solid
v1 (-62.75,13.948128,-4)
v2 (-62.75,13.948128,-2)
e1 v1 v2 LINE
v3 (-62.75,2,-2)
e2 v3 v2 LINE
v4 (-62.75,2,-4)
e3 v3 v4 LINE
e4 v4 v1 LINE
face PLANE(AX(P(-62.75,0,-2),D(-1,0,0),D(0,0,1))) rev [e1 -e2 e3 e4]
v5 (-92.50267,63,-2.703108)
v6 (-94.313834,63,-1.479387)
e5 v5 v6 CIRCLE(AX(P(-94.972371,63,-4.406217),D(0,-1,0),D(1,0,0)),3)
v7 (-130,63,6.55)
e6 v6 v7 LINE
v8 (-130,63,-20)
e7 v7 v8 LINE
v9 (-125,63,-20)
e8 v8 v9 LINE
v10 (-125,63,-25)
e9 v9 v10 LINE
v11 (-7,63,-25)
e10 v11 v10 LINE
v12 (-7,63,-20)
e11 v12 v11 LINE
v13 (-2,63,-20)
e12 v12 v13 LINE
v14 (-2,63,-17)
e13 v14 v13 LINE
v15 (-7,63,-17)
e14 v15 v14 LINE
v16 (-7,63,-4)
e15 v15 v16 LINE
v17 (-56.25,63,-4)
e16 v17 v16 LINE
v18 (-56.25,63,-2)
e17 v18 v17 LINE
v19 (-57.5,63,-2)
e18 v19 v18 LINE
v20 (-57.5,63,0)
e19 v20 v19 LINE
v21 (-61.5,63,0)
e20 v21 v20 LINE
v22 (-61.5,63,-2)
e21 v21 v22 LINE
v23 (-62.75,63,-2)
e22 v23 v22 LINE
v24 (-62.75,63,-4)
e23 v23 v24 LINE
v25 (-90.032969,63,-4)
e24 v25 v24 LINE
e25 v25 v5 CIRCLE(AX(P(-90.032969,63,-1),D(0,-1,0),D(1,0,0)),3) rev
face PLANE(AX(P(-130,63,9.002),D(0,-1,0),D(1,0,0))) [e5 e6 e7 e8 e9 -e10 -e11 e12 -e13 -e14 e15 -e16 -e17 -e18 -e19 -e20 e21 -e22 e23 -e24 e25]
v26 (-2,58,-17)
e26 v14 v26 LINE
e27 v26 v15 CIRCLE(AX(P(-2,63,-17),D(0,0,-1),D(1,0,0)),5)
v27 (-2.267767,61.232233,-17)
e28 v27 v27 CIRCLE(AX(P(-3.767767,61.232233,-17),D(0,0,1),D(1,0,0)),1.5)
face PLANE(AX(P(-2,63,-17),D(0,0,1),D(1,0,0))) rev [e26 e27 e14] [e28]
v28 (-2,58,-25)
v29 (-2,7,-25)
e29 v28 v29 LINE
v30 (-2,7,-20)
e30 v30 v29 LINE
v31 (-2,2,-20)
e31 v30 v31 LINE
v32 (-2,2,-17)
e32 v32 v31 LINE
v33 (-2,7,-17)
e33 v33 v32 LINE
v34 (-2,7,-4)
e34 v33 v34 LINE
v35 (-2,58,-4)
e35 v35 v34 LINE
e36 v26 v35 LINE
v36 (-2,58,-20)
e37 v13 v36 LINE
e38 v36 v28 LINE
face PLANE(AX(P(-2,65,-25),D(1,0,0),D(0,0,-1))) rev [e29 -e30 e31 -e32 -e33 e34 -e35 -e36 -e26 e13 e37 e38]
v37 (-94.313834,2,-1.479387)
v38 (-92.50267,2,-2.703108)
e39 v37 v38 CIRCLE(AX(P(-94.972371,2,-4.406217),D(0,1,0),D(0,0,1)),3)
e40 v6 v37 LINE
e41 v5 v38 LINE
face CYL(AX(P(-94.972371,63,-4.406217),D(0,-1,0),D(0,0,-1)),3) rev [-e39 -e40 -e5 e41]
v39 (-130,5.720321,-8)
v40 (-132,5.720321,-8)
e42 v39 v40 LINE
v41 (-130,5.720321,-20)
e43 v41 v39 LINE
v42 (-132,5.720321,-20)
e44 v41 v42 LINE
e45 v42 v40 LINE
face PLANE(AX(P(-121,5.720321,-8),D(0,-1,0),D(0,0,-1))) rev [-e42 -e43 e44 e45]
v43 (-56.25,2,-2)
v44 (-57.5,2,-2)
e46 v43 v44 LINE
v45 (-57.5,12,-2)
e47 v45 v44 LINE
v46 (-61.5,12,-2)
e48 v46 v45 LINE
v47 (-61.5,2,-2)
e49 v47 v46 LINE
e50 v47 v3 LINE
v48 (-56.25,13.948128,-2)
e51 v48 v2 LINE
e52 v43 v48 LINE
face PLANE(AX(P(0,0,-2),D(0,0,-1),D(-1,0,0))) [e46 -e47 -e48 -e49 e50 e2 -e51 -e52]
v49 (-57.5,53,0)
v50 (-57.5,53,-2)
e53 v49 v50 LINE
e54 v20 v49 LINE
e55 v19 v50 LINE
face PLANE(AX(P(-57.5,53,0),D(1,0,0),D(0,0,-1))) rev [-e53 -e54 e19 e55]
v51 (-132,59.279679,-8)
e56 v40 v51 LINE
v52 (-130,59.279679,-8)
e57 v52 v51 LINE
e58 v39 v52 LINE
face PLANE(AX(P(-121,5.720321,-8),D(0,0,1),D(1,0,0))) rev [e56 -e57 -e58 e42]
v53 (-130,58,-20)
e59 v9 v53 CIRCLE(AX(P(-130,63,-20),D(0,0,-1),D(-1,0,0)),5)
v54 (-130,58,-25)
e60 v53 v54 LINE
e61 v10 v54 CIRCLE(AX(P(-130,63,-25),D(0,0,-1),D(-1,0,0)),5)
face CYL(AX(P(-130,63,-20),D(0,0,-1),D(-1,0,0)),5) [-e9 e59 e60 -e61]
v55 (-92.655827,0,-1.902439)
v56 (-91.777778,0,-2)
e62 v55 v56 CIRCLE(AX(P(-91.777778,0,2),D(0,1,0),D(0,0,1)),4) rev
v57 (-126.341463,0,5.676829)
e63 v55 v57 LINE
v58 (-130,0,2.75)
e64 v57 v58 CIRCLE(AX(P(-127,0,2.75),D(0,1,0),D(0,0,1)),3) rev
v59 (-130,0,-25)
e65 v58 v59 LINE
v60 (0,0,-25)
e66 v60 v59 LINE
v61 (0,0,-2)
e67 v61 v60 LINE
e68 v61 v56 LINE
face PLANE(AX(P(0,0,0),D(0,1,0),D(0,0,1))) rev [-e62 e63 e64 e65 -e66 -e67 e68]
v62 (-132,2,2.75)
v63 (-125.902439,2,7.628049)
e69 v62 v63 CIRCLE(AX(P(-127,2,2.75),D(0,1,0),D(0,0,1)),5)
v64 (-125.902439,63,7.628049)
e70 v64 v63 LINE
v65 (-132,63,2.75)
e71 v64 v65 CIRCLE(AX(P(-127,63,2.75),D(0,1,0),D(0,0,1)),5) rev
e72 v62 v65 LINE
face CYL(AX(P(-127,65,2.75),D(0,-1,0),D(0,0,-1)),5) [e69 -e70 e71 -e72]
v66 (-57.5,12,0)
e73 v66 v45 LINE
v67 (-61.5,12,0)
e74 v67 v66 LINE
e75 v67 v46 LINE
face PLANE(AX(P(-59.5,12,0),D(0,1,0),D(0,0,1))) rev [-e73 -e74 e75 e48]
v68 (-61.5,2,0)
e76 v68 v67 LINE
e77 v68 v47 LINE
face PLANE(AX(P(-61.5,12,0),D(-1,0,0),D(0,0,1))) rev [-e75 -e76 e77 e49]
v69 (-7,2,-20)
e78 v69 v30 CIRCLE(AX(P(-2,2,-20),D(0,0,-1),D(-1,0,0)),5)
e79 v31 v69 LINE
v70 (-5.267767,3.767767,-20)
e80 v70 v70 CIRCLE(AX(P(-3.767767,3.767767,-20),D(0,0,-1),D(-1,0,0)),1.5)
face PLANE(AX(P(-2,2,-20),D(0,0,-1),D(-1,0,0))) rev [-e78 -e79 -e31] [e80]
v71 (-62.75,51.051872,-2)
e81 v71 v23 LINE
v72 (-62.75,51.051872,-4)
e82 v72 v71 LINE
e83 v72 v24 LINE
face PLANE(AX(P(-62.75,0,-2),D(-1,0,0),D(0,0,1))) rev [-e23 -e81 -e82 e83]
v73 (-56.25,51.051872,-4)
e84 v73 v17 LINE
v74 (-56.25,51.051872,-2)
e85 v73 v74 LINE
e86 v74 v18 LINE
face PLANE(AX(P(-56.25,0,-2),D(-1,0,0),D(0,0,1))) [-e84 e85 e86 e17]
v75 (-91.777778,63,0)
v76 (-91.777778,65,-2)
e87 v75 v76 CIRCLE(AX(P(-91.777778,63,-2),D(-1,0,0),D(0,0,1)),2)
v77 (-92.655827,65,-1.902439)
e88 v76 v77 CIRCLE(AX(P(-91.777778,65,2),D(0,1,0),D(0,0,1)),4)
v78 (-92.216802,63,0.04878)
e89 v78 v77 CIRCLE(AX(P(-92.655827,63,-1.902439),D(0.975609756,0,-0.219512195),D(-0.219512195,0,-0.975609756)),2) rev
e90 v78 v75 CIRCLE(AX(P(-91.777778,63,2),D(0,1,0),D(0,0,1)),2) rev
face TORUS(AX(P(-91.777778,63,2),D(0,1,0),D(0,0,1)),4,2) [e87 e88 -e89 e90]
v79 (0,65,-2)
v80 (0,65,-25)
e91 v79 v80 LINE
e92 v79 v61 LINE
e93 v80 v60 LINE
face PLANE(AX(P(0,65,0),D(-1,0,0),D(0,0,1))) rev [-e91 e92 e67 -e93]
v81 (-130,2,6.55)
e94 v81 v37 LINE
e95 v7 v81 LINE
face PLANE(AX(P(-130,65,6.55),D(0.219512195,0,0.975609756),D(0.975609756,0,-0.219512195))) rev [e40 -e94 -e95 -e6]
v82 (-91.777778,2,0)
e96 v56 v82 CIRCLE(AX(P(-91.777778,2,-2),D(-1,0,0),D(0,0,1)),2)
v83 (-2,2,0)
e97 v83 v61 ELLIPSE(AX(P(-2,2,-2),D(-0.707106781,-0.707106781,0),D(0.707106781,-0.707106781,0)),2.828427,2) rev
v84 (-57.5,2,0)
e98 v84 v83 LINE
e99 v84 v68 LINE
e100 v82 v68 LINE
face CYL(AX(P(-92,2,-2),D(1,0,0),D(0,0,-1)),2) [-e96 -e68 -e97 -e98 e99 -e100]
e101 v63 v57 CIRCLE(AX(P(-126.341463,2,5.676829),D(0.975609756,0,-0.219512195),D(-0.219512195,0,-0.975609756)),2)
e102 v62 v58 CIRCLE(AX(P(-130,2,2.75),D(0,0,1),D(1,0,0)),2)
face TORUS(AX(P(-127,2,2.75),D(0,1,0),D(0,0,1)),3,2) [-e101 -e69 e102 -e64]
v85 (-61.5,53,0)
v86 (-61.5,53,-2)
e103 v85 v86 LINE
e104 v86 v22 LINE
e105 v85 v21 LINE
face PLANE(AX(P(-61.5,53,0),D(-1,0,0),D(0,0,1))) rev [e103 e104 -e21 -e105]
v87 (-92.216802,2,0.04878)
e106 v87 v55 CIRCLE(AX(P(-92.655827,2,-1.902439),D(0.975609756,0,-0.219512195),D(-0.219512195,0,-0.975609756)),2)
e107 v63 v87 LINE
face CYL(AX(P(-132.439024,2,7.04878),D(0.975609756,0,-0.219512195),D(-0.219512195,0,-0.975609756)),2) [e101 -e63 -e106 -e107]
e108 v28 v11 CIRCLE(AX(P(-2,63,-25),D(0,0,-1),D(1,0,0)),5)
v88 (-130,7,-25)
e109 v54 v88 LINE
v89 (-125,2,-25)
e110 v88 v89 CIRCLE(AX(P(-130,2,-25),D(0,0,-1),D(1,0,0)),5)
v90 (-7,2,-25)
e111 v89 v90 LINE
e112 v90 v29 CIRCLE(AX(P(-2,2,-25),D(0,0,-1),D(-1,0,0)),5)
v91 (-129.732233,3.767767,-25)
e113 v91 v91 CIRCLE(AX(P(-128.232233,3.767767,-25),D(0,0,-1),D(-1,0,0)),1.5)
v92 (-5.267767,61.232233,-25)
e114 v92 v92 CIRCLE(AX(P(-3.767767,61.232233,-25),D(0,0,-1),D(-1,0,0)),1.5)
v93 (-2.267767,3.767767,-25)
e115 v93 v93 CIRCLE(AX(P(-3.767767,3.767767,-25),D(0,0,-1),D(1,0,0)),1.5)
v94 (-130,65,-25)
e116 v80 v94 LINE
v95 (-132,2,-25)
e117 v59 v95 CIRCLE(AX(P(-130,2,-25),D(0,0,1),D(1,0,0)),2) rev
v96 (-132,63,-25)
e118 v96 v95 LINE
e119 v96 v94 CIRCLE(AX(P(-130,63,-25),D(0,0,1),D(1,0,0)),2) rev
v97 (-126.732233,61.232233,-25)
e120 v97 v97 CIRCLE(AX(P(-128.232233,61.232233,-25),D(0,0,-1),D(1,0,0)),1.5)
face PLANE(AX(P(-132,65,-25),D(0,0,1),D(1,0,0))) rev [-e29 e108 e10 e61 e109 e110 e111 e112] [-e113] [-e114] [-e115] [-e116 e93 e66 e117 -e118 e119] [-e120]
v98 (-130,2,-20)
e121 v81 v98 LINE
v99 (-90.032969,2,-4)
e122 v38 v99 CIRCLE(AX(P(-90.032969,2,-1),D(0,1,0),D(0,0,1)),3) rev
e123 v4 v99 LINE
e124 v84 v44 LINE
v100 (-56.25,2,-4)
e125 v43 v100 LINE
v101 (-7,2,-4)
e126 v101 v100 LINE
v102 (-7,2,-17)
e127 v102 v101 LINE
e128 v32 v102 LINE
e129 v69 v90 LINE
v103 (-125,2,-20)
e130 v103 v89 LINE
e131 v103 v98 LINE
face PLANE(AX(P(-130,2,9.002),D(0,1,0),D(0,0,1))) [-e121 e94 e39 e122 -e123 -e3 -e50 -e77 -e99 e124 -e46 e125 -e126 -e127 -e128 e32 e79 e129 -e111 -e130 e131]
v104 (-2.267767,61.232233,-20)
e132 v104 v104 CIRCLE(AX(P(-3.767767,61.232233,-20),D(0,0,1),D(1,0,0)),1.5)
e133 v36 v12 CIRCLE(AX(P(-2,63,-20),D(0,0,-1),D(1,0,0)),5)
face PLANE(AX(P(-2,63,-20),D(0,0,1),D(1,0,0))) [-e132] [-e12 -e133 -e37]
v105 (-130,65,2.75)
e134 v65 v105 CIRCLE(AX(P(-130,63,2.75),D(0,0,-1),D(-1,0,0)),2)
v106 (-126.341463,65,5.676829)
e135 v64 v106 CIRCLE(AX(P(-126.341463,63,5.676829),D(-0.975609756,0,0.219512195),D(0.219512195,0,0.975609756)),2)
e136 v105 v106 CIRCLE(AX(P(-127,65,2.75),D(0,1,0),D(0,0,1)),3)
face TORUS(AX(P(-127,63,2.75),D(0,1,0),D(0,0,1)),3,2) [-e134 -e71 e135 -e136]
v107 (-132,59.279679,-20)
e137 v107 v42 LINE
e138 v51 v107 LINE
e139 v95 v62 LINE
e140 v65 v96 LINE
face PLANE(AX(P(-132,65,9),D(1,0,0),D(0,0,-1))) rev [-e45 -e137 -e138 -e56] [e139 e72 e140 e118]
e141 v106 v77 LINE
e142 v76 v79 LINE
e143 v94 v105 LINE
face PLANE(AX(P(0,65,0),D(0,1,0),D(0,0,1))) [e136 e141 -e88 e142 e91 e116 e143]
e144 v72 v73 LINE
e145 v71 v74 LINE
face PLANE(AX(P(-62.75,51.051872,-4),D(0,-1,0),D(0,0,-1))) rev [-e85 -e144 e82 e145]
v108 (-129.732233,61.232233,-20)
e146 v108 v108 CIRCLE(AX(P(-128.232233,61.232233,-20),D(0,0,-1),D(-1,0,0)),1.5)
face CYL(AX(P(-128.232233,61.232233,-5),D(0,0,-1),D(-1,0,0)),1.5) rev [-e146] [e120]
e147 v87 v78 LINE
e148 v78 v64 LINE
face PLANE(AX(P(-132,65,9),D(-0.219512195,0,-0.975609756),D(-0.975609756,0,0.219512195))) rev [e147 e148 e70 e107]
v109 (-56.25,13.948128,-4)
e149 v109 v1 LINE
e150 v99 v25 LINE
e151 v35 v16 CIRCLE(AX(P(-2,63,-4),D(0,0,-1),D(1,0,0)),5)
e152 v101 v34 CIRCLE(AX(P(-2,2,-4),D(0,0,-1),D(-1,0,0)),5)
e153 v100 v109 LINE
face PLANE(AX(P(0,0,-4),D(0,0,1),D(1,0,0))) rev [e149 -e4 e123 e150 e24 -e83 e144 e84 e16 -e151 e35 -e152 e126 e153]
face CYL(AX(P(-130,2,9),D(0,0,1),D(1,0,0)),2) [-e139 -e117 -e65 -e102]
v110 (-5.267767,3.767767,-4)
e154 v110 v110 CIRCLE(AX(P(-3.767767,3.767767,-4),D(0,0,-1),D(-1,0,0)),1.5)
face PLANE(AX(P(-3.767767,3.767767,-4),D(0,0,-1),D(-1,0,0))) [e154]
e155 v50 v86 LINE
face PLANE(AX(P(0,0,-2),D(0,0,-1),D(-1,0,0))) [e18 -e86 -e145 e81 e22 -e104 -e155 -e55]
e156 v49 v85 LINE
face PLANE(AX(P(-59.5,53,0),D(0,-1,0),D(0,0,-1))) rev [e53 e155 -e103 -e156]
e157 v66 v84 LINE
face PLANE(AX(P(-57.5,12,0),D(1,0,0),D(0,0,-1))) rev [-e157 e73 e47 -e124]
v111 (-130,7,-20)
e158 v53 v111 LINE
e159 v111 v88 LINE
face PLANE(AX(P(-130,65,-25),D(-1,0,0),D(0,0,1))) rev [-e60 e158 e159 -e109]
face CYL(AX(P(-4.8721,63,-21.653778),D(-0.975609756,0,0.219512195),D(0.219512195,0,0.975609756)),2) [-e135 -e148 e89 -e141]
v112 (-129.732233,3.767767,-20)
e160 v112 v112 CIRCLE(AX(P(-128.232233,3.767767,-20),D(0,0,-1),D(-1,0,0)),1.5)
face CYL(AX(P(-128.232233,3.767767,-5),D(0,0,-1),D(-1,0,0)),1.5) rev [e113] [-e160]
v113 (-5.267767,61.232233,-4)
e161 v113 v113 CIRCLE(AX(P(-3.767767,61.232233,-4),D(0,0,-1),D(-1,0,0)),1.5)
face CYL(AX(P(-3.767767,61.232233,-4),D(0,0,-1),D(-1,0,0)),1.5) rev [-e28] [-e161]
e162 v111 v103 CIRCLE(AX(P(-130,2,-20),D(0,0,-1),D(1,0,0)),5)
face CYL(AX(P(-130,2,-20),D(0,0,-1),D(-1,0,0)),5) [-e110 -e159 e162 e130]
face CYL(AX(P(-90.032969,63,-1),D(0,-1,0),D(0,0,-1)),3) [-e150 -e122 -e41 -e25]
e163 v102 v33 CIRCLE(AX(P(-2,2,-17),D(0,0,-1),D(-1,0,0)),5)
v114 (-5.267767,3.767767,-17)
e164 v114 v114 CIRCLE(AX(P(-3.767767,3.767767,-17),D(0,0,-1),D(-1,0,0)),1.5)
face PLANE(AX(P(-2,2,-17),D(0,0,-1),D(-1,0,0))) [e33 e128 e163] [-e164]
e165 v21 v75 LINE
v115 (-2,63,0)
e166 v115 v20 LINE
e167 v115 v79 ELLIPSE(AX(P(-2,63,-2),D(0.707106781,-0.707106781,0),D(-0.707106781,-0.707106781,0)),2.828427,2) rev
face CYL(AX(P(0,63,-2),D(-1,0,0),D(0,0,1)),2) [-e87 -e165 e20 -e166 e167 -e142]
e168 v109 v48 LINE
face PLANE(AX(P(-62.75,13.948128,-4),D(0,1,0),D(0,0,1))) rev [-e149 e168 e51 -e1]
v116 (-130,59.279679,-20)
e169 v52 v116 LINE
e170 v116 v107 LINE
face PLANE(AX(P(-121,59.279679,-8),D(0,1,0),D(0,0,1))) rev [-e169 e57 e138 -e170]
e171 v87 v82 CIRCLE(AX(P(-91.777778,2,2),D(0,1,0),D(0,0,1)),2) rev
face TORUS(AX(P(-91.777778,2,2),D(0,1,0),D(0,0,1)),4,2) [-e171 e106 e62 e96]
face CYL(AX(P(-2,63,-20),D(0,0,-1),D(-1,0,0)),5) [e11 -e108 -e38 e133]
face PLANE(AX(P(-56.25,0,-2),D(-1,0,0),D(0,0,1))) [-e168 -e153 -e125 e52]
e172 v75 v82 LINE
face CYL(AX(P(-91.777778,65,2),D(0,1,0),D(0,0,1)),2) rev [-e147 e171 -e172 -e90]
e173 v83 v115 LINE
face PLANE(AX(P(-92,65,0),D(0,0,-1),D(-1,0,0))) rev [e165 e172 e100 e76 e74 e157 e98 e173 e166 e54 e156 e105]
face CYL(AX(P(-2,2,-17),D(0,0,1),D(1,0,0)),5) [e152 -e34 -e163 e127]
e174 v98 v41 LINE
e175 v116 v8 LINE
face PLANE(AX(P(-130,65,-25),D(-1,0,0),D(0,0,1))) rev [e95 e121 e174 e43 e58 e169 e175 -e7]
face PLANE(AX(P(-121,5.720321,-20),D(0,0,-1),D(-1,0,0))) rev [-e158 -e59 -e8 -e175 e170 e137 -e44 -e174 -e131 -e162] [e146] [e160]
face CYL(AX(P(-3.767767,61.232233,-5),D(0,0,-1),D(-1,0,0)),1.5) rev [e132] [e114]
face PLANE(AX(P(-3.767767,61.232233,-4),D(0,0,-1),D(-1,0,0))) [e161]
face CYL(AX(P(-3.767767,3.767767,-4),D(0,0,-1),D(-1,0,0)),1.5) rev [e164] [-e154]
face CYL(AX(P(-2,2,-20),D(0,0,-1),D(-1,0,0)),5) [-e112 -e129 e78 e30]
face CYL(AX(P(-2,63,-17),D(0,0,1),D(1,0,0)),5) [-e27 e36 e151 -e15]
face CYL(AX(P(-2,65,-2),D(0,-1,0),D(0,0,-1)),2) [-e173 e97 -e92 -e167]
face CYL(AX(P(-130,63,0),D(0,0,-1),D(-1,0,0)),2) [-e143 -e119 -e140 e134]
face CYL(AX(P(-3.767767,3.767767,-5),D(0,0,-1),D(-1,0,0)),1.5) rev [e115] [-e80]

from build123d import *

# Parameters (mm, degrees)
BOSS_EXTRUDE3_DEPTH = 65
BOSS_EXTRUDE4_REACH = 153.013
SKETCH4_W           = 128
SKETCH4_H           = 2
SKETCH5_W           = 12
SKETCH5_H           = 53.559358602
CUT_EXTRUDE2_DEPTH  = 11
FILLET1_R           = 5
FILLET2_R           = 2
SKETCH7_W           = 90
SKETCH7_H           = 61
BOSS_EXTRUDE5_DEPTH = 2
BOSS_EXTRUDE6_DEPTH = 5
SKETCH12_R          = 1.5
CUT_EXTRUDE5_DEPTH  = 20
BOSS_EXTRUDE7_START = 13
BOSS_EXTRUDE7_DEPTH = 13
SKETCH15_R          = 1.5
CUT_EXTRUDE6_DEPTH  = 21
SKETCH16_W          = 6.5
SKETCH16_H          = 61
CUT_EXTRUDE7_DEPTH  = 2
FILLET3_R           = 3
FILLET4_R           = 3
CUT_EXTRUDE9_DEPTH  = 2
SKETCH18_W          = 6.5
SKETCH18_H          = 37.103743482
BOSS_EXTRUDE8_DEPTH = 2


with BuildPart() as part:
    # Sketch3 → Boss-Extrude3 (new body)
    with BuildSketch(Plane(origin=(0, 0, 0), x_dir=(1, 0, 0), z_dir=(0, 1, 0))):
        Polygon((0, 0), (0, 25), (-2, 25), (-2, 2), (-92, 2), (-130, -6.55), (-130, 25), (-132, 25), (-132, -9), (-92, 0), align=None)
    extrude(amount=BOSS_EXTRUDE3_DEPTH)

    # Sketch4 → Boss-Extrude4 (add, up to next)
    with BuildSketch(Plane(origin=(0, 0, -25), x_dir=(-1, 0, 0), z_dir=(0, 0, -1)), mode=Mode.PRIVATE) as boss_extrude4_sk1:
        with Locations((66, 64)):
            Rectangle(SKETCH4_W, SKETCH4_H)
    boss_extrude4_tool1 = extrude(boss_extrude4_sk1.sketch, amount=-BOSS_EXTRUDE4_REACH, mode=Mode.PRIVATE) - part.part
    # Sketch4 → Boss-Extrude4 (add, up to next)
    with BuildSketch(Plane(origin=(0, 0, -25), x_dir=(-1, 0, 0), z_dir=(0, 0, -1)), mode=Mode.PRIVATE) as boss_extrude4_sk2:
        with Locations((66, 1)):
            Rectangle(SKETCH4_W, SKETCH4_H)
    boss_extrude4_tool2 = extrude(boss_extrude4_sk2.sketch, amount=-BOSS_EXTRUDE4_REACH, mode=Mode.PRIVATE) - part.part
    add(boss_extrude4_tool1.solids().sort_by_distance((-66, 64, -25))[0])
    add(boss_extrude4_tool2.solids().sort_by_distance((-66, 1, -25))[0])

    # Sketch5 → Cut-Extrude2 (cut)
    with BuildSketch(Plane.ZY.offset(132)):
        with Locations((-14, 32.5)):
            Rectangle(SKETCH5_W, SKETCH5_H)
    extrude(amount=-CUT_EXTRUDE2_DEPTH, mode=Mode.SUBTRACT)

    # Fillet1
    fillet1_edges = [part.edges().sort_by_distance(p)[0] for p in [
        (-132, 32.5, 9),
    ]]
    fillet(fillet1_edges, radius=FILLET1_R)

    # Fillet2
    fillet2_edges = [part.edges().sort_by_distance(p)[0] for p in [
        (-132, 0, -11.125),
        (-46, 0, 0),
        (-92, 32.5, 0),
        (0, 32.5, 0),
        (-132, 65, -11.125),
        (-46, 65, 0),
        (-108.951219512, 0, 3.81402439),
        (-108.951219512, 65, 3.81402439),
        (-130.123475238, 0, 6.654344047),
        (-130.123475238, 65, 6.654344047),
    ]]
    fillet(fillet2_edges, radius=FILLET2_R)

    # Sketch7 → Boss-Extrude5 (add)
    with BuildSketch(Plane(origin=(0, 0, -2), x_dir=(-1, 0, 0), z_dir=(0, 0, -1))):
        with Locations((47, 32.5)):
            Rectangle(SKETCH7_W, SKETCH7_H)
    extrude(amount=BOSS_EXTRUDE5_DEPTH)

    # Sketch11 → Boss-Extrude6 (add)
    with BuildSketch(Plane(origin=(0, 0, -25), x_dir=(-1, 0, 0), z_dir=(0, 0, -1))):
        with BuildLine():
            Line((7, 63), (2, 63))
            Line((2, 63), (2, 58))
            ThreePointArc((2, 58), (5.535533906, 59.464466094), (7, 63))
        make_face()
        with BuildLine():
            Line((2, 7), (2, 2))
            Line((2, 2), (7, 2))
            ThreePointArc((7, 2), (5.535533906, 5.535533906), (2, 7))
        make_face()
        with BuildLine():
            Line((125, 2), (130, 2))
            Line((130, 2), (130, 7))
            ThreePointArc((130, 7), (126.464466094, 5.535533906), (125, 2))
        make_face()
        with BuildLine():
            Line((125, 63), (130, 63))
            Line((130, 63), (130, 58))
            ThreePointArc((130, 58), (126.464466094, 59.464466094), (125, 63))
        make_face()
    extrude(amount=-BOSS_EXTRUDE6_DEPTH)

    # Sketch12 → Cut-Extrude5 (cut)
    with BuildSketch(Plane(origin=(0, 0, -25), x_dir=(-1, 0, 0), z_dir=(0, 0, -1))):
        with Locations((3.767766953, 61.232233047)):
            Circle(SKETCH12_R)
        with Locations((128.232233047, 61.232233047)):
            Circle(SKETCH12_R)
        with Locations((128.232233047, 3.767766953)):
            Circle(SKETCH12_R)
        with Locations((3.767766953, 3.767766953)):
            Circle(SKETCH12_R)
    extrude(amount=-CUT_EXTRUDE5_DEPTH, mode=Mode.SUBTRACT)

    # Sketch14 → Boss-Extrude7 (add)
    with BuildSketch(Plane(origin=(0, 0, -4), x_dir=(-1, 0, 0), z_dir=(0, 0, -1)).offset(BOSS_EXTRUDE7_START)):
        with BuildLine():
            Line((2, 58), (2, 63))
            Line((2, 63), (7, 63))
            ThreePointArc((7, 63), (5.535533906, 59.464466094), (2, 58))
        make_face()
        with BuildLine():
            Line((2, 2), (7, 2))
            ThreePointArc((7, 2), (5.535533906, 5.535533906), (2, 7))
            Line((2, 7), (2, 2))
        make_face()
    extrude(amount=-BOSS_EXTRUDE7_DEPTH)

    # Sketch15 → Cut-Extrude6 (cut)
    with BuildSketch(Plane(origin=(0, 0, -25), x_dir=(-1, 0, 0), z_dir=(0, 0, -1))):
        with Locations((3.767766953, 3.767766953)):
            Circle(SKETCH15_R)
        with Locations((3.767766953, 61.232233047)):
            Circle(SKETCH15_R)
    extrude(amount=-CUT_EXTRUDE6_DEPTH, mode=Mode.SUBTRACT)

    # Sketch16 → Cut-Extrude7 (cut)
    with BuildSketch(Plane(origin=(0, 0, -4), x_dir=(-1, 0, 0), z_dir=(0, 0, -1))):
        with Locations((59.5, 32.5)):
            Rectangle(SKETCH16_W, SKETCH16_H)
    extrude(amount=-CUT_EXTRUDE7_DEPTH, mode=Mode.SUBTRACT)

    # Fillet3
    # the kernel refuses this fillet: 3 mm, written as the material it adds along each edge
    with BuildSketch(Plane(origin=(-92, 2, -2), x_dir=(-2.9487523534032267e-12, 0, -1.0), z_dir=(0, 1, 0))) as fillet3_piece_1:
        with BuildLine():
            CenterArc((2.406216573, 2.972370787), FILLET3_R, 192.680383492, 69.537546468)
            Line((-0.520612695, 2.313834202), (-0.579149281, 2.30066347))
            Line((-0.579149281, 2.30066347), (-0.058536585, -0.013170732))
            Line((-0.058536585, -0.013170732), (0, -0.06))
            ThreePointArc((0, -0.06), (1, -0.06), (1.991875669, -0.059447416))
            Line((1.991875669, -0.059447416), (2, 0))
        make_face()
    extrude(amount=61)

    # Fillet4
    fillet4_edges = [part.edges().sort_by_distance(p)[0] for p in [
        (-92, 32.5, -4),
    ]]
    fillet(fillet4_edges, radius=FILLET4_R)

    # Sketch17 → Cut-Extrude9 (cut)
    with BuildSketch(Plane(origin=(0, 0, -2), x_dir=(-1, 0, 0), z_dir=(0, 0, -1))):
        Polygon((59.5, 53), (61.5, 53), (61.5, 63), (57.5, 63), (57.5, 53), align=None)
        Polygon((57.5, 2), (61.5, 2), (61.5, 12), (59.5, 12), (57.5, 12), align=None)
    extrude(amount=-CUT_EXTRUDE9_DEPTH, mode=Mode.SUBTRACT)

    # Sketch18 → Boss-Extrude8 (add)
    with BuildSketch(Plane(origin=(0, 0, -2), x_dir=(-1, 0, 0), z_dir=(0, 0, -1))):
        with Locations((59.5, 32.5)):
            Rectangle(SKETCH18_W, SKETCH18_H)
    extrude(amount=BOSS_EXTRUDE8_DEPTH)


solid = part.part
